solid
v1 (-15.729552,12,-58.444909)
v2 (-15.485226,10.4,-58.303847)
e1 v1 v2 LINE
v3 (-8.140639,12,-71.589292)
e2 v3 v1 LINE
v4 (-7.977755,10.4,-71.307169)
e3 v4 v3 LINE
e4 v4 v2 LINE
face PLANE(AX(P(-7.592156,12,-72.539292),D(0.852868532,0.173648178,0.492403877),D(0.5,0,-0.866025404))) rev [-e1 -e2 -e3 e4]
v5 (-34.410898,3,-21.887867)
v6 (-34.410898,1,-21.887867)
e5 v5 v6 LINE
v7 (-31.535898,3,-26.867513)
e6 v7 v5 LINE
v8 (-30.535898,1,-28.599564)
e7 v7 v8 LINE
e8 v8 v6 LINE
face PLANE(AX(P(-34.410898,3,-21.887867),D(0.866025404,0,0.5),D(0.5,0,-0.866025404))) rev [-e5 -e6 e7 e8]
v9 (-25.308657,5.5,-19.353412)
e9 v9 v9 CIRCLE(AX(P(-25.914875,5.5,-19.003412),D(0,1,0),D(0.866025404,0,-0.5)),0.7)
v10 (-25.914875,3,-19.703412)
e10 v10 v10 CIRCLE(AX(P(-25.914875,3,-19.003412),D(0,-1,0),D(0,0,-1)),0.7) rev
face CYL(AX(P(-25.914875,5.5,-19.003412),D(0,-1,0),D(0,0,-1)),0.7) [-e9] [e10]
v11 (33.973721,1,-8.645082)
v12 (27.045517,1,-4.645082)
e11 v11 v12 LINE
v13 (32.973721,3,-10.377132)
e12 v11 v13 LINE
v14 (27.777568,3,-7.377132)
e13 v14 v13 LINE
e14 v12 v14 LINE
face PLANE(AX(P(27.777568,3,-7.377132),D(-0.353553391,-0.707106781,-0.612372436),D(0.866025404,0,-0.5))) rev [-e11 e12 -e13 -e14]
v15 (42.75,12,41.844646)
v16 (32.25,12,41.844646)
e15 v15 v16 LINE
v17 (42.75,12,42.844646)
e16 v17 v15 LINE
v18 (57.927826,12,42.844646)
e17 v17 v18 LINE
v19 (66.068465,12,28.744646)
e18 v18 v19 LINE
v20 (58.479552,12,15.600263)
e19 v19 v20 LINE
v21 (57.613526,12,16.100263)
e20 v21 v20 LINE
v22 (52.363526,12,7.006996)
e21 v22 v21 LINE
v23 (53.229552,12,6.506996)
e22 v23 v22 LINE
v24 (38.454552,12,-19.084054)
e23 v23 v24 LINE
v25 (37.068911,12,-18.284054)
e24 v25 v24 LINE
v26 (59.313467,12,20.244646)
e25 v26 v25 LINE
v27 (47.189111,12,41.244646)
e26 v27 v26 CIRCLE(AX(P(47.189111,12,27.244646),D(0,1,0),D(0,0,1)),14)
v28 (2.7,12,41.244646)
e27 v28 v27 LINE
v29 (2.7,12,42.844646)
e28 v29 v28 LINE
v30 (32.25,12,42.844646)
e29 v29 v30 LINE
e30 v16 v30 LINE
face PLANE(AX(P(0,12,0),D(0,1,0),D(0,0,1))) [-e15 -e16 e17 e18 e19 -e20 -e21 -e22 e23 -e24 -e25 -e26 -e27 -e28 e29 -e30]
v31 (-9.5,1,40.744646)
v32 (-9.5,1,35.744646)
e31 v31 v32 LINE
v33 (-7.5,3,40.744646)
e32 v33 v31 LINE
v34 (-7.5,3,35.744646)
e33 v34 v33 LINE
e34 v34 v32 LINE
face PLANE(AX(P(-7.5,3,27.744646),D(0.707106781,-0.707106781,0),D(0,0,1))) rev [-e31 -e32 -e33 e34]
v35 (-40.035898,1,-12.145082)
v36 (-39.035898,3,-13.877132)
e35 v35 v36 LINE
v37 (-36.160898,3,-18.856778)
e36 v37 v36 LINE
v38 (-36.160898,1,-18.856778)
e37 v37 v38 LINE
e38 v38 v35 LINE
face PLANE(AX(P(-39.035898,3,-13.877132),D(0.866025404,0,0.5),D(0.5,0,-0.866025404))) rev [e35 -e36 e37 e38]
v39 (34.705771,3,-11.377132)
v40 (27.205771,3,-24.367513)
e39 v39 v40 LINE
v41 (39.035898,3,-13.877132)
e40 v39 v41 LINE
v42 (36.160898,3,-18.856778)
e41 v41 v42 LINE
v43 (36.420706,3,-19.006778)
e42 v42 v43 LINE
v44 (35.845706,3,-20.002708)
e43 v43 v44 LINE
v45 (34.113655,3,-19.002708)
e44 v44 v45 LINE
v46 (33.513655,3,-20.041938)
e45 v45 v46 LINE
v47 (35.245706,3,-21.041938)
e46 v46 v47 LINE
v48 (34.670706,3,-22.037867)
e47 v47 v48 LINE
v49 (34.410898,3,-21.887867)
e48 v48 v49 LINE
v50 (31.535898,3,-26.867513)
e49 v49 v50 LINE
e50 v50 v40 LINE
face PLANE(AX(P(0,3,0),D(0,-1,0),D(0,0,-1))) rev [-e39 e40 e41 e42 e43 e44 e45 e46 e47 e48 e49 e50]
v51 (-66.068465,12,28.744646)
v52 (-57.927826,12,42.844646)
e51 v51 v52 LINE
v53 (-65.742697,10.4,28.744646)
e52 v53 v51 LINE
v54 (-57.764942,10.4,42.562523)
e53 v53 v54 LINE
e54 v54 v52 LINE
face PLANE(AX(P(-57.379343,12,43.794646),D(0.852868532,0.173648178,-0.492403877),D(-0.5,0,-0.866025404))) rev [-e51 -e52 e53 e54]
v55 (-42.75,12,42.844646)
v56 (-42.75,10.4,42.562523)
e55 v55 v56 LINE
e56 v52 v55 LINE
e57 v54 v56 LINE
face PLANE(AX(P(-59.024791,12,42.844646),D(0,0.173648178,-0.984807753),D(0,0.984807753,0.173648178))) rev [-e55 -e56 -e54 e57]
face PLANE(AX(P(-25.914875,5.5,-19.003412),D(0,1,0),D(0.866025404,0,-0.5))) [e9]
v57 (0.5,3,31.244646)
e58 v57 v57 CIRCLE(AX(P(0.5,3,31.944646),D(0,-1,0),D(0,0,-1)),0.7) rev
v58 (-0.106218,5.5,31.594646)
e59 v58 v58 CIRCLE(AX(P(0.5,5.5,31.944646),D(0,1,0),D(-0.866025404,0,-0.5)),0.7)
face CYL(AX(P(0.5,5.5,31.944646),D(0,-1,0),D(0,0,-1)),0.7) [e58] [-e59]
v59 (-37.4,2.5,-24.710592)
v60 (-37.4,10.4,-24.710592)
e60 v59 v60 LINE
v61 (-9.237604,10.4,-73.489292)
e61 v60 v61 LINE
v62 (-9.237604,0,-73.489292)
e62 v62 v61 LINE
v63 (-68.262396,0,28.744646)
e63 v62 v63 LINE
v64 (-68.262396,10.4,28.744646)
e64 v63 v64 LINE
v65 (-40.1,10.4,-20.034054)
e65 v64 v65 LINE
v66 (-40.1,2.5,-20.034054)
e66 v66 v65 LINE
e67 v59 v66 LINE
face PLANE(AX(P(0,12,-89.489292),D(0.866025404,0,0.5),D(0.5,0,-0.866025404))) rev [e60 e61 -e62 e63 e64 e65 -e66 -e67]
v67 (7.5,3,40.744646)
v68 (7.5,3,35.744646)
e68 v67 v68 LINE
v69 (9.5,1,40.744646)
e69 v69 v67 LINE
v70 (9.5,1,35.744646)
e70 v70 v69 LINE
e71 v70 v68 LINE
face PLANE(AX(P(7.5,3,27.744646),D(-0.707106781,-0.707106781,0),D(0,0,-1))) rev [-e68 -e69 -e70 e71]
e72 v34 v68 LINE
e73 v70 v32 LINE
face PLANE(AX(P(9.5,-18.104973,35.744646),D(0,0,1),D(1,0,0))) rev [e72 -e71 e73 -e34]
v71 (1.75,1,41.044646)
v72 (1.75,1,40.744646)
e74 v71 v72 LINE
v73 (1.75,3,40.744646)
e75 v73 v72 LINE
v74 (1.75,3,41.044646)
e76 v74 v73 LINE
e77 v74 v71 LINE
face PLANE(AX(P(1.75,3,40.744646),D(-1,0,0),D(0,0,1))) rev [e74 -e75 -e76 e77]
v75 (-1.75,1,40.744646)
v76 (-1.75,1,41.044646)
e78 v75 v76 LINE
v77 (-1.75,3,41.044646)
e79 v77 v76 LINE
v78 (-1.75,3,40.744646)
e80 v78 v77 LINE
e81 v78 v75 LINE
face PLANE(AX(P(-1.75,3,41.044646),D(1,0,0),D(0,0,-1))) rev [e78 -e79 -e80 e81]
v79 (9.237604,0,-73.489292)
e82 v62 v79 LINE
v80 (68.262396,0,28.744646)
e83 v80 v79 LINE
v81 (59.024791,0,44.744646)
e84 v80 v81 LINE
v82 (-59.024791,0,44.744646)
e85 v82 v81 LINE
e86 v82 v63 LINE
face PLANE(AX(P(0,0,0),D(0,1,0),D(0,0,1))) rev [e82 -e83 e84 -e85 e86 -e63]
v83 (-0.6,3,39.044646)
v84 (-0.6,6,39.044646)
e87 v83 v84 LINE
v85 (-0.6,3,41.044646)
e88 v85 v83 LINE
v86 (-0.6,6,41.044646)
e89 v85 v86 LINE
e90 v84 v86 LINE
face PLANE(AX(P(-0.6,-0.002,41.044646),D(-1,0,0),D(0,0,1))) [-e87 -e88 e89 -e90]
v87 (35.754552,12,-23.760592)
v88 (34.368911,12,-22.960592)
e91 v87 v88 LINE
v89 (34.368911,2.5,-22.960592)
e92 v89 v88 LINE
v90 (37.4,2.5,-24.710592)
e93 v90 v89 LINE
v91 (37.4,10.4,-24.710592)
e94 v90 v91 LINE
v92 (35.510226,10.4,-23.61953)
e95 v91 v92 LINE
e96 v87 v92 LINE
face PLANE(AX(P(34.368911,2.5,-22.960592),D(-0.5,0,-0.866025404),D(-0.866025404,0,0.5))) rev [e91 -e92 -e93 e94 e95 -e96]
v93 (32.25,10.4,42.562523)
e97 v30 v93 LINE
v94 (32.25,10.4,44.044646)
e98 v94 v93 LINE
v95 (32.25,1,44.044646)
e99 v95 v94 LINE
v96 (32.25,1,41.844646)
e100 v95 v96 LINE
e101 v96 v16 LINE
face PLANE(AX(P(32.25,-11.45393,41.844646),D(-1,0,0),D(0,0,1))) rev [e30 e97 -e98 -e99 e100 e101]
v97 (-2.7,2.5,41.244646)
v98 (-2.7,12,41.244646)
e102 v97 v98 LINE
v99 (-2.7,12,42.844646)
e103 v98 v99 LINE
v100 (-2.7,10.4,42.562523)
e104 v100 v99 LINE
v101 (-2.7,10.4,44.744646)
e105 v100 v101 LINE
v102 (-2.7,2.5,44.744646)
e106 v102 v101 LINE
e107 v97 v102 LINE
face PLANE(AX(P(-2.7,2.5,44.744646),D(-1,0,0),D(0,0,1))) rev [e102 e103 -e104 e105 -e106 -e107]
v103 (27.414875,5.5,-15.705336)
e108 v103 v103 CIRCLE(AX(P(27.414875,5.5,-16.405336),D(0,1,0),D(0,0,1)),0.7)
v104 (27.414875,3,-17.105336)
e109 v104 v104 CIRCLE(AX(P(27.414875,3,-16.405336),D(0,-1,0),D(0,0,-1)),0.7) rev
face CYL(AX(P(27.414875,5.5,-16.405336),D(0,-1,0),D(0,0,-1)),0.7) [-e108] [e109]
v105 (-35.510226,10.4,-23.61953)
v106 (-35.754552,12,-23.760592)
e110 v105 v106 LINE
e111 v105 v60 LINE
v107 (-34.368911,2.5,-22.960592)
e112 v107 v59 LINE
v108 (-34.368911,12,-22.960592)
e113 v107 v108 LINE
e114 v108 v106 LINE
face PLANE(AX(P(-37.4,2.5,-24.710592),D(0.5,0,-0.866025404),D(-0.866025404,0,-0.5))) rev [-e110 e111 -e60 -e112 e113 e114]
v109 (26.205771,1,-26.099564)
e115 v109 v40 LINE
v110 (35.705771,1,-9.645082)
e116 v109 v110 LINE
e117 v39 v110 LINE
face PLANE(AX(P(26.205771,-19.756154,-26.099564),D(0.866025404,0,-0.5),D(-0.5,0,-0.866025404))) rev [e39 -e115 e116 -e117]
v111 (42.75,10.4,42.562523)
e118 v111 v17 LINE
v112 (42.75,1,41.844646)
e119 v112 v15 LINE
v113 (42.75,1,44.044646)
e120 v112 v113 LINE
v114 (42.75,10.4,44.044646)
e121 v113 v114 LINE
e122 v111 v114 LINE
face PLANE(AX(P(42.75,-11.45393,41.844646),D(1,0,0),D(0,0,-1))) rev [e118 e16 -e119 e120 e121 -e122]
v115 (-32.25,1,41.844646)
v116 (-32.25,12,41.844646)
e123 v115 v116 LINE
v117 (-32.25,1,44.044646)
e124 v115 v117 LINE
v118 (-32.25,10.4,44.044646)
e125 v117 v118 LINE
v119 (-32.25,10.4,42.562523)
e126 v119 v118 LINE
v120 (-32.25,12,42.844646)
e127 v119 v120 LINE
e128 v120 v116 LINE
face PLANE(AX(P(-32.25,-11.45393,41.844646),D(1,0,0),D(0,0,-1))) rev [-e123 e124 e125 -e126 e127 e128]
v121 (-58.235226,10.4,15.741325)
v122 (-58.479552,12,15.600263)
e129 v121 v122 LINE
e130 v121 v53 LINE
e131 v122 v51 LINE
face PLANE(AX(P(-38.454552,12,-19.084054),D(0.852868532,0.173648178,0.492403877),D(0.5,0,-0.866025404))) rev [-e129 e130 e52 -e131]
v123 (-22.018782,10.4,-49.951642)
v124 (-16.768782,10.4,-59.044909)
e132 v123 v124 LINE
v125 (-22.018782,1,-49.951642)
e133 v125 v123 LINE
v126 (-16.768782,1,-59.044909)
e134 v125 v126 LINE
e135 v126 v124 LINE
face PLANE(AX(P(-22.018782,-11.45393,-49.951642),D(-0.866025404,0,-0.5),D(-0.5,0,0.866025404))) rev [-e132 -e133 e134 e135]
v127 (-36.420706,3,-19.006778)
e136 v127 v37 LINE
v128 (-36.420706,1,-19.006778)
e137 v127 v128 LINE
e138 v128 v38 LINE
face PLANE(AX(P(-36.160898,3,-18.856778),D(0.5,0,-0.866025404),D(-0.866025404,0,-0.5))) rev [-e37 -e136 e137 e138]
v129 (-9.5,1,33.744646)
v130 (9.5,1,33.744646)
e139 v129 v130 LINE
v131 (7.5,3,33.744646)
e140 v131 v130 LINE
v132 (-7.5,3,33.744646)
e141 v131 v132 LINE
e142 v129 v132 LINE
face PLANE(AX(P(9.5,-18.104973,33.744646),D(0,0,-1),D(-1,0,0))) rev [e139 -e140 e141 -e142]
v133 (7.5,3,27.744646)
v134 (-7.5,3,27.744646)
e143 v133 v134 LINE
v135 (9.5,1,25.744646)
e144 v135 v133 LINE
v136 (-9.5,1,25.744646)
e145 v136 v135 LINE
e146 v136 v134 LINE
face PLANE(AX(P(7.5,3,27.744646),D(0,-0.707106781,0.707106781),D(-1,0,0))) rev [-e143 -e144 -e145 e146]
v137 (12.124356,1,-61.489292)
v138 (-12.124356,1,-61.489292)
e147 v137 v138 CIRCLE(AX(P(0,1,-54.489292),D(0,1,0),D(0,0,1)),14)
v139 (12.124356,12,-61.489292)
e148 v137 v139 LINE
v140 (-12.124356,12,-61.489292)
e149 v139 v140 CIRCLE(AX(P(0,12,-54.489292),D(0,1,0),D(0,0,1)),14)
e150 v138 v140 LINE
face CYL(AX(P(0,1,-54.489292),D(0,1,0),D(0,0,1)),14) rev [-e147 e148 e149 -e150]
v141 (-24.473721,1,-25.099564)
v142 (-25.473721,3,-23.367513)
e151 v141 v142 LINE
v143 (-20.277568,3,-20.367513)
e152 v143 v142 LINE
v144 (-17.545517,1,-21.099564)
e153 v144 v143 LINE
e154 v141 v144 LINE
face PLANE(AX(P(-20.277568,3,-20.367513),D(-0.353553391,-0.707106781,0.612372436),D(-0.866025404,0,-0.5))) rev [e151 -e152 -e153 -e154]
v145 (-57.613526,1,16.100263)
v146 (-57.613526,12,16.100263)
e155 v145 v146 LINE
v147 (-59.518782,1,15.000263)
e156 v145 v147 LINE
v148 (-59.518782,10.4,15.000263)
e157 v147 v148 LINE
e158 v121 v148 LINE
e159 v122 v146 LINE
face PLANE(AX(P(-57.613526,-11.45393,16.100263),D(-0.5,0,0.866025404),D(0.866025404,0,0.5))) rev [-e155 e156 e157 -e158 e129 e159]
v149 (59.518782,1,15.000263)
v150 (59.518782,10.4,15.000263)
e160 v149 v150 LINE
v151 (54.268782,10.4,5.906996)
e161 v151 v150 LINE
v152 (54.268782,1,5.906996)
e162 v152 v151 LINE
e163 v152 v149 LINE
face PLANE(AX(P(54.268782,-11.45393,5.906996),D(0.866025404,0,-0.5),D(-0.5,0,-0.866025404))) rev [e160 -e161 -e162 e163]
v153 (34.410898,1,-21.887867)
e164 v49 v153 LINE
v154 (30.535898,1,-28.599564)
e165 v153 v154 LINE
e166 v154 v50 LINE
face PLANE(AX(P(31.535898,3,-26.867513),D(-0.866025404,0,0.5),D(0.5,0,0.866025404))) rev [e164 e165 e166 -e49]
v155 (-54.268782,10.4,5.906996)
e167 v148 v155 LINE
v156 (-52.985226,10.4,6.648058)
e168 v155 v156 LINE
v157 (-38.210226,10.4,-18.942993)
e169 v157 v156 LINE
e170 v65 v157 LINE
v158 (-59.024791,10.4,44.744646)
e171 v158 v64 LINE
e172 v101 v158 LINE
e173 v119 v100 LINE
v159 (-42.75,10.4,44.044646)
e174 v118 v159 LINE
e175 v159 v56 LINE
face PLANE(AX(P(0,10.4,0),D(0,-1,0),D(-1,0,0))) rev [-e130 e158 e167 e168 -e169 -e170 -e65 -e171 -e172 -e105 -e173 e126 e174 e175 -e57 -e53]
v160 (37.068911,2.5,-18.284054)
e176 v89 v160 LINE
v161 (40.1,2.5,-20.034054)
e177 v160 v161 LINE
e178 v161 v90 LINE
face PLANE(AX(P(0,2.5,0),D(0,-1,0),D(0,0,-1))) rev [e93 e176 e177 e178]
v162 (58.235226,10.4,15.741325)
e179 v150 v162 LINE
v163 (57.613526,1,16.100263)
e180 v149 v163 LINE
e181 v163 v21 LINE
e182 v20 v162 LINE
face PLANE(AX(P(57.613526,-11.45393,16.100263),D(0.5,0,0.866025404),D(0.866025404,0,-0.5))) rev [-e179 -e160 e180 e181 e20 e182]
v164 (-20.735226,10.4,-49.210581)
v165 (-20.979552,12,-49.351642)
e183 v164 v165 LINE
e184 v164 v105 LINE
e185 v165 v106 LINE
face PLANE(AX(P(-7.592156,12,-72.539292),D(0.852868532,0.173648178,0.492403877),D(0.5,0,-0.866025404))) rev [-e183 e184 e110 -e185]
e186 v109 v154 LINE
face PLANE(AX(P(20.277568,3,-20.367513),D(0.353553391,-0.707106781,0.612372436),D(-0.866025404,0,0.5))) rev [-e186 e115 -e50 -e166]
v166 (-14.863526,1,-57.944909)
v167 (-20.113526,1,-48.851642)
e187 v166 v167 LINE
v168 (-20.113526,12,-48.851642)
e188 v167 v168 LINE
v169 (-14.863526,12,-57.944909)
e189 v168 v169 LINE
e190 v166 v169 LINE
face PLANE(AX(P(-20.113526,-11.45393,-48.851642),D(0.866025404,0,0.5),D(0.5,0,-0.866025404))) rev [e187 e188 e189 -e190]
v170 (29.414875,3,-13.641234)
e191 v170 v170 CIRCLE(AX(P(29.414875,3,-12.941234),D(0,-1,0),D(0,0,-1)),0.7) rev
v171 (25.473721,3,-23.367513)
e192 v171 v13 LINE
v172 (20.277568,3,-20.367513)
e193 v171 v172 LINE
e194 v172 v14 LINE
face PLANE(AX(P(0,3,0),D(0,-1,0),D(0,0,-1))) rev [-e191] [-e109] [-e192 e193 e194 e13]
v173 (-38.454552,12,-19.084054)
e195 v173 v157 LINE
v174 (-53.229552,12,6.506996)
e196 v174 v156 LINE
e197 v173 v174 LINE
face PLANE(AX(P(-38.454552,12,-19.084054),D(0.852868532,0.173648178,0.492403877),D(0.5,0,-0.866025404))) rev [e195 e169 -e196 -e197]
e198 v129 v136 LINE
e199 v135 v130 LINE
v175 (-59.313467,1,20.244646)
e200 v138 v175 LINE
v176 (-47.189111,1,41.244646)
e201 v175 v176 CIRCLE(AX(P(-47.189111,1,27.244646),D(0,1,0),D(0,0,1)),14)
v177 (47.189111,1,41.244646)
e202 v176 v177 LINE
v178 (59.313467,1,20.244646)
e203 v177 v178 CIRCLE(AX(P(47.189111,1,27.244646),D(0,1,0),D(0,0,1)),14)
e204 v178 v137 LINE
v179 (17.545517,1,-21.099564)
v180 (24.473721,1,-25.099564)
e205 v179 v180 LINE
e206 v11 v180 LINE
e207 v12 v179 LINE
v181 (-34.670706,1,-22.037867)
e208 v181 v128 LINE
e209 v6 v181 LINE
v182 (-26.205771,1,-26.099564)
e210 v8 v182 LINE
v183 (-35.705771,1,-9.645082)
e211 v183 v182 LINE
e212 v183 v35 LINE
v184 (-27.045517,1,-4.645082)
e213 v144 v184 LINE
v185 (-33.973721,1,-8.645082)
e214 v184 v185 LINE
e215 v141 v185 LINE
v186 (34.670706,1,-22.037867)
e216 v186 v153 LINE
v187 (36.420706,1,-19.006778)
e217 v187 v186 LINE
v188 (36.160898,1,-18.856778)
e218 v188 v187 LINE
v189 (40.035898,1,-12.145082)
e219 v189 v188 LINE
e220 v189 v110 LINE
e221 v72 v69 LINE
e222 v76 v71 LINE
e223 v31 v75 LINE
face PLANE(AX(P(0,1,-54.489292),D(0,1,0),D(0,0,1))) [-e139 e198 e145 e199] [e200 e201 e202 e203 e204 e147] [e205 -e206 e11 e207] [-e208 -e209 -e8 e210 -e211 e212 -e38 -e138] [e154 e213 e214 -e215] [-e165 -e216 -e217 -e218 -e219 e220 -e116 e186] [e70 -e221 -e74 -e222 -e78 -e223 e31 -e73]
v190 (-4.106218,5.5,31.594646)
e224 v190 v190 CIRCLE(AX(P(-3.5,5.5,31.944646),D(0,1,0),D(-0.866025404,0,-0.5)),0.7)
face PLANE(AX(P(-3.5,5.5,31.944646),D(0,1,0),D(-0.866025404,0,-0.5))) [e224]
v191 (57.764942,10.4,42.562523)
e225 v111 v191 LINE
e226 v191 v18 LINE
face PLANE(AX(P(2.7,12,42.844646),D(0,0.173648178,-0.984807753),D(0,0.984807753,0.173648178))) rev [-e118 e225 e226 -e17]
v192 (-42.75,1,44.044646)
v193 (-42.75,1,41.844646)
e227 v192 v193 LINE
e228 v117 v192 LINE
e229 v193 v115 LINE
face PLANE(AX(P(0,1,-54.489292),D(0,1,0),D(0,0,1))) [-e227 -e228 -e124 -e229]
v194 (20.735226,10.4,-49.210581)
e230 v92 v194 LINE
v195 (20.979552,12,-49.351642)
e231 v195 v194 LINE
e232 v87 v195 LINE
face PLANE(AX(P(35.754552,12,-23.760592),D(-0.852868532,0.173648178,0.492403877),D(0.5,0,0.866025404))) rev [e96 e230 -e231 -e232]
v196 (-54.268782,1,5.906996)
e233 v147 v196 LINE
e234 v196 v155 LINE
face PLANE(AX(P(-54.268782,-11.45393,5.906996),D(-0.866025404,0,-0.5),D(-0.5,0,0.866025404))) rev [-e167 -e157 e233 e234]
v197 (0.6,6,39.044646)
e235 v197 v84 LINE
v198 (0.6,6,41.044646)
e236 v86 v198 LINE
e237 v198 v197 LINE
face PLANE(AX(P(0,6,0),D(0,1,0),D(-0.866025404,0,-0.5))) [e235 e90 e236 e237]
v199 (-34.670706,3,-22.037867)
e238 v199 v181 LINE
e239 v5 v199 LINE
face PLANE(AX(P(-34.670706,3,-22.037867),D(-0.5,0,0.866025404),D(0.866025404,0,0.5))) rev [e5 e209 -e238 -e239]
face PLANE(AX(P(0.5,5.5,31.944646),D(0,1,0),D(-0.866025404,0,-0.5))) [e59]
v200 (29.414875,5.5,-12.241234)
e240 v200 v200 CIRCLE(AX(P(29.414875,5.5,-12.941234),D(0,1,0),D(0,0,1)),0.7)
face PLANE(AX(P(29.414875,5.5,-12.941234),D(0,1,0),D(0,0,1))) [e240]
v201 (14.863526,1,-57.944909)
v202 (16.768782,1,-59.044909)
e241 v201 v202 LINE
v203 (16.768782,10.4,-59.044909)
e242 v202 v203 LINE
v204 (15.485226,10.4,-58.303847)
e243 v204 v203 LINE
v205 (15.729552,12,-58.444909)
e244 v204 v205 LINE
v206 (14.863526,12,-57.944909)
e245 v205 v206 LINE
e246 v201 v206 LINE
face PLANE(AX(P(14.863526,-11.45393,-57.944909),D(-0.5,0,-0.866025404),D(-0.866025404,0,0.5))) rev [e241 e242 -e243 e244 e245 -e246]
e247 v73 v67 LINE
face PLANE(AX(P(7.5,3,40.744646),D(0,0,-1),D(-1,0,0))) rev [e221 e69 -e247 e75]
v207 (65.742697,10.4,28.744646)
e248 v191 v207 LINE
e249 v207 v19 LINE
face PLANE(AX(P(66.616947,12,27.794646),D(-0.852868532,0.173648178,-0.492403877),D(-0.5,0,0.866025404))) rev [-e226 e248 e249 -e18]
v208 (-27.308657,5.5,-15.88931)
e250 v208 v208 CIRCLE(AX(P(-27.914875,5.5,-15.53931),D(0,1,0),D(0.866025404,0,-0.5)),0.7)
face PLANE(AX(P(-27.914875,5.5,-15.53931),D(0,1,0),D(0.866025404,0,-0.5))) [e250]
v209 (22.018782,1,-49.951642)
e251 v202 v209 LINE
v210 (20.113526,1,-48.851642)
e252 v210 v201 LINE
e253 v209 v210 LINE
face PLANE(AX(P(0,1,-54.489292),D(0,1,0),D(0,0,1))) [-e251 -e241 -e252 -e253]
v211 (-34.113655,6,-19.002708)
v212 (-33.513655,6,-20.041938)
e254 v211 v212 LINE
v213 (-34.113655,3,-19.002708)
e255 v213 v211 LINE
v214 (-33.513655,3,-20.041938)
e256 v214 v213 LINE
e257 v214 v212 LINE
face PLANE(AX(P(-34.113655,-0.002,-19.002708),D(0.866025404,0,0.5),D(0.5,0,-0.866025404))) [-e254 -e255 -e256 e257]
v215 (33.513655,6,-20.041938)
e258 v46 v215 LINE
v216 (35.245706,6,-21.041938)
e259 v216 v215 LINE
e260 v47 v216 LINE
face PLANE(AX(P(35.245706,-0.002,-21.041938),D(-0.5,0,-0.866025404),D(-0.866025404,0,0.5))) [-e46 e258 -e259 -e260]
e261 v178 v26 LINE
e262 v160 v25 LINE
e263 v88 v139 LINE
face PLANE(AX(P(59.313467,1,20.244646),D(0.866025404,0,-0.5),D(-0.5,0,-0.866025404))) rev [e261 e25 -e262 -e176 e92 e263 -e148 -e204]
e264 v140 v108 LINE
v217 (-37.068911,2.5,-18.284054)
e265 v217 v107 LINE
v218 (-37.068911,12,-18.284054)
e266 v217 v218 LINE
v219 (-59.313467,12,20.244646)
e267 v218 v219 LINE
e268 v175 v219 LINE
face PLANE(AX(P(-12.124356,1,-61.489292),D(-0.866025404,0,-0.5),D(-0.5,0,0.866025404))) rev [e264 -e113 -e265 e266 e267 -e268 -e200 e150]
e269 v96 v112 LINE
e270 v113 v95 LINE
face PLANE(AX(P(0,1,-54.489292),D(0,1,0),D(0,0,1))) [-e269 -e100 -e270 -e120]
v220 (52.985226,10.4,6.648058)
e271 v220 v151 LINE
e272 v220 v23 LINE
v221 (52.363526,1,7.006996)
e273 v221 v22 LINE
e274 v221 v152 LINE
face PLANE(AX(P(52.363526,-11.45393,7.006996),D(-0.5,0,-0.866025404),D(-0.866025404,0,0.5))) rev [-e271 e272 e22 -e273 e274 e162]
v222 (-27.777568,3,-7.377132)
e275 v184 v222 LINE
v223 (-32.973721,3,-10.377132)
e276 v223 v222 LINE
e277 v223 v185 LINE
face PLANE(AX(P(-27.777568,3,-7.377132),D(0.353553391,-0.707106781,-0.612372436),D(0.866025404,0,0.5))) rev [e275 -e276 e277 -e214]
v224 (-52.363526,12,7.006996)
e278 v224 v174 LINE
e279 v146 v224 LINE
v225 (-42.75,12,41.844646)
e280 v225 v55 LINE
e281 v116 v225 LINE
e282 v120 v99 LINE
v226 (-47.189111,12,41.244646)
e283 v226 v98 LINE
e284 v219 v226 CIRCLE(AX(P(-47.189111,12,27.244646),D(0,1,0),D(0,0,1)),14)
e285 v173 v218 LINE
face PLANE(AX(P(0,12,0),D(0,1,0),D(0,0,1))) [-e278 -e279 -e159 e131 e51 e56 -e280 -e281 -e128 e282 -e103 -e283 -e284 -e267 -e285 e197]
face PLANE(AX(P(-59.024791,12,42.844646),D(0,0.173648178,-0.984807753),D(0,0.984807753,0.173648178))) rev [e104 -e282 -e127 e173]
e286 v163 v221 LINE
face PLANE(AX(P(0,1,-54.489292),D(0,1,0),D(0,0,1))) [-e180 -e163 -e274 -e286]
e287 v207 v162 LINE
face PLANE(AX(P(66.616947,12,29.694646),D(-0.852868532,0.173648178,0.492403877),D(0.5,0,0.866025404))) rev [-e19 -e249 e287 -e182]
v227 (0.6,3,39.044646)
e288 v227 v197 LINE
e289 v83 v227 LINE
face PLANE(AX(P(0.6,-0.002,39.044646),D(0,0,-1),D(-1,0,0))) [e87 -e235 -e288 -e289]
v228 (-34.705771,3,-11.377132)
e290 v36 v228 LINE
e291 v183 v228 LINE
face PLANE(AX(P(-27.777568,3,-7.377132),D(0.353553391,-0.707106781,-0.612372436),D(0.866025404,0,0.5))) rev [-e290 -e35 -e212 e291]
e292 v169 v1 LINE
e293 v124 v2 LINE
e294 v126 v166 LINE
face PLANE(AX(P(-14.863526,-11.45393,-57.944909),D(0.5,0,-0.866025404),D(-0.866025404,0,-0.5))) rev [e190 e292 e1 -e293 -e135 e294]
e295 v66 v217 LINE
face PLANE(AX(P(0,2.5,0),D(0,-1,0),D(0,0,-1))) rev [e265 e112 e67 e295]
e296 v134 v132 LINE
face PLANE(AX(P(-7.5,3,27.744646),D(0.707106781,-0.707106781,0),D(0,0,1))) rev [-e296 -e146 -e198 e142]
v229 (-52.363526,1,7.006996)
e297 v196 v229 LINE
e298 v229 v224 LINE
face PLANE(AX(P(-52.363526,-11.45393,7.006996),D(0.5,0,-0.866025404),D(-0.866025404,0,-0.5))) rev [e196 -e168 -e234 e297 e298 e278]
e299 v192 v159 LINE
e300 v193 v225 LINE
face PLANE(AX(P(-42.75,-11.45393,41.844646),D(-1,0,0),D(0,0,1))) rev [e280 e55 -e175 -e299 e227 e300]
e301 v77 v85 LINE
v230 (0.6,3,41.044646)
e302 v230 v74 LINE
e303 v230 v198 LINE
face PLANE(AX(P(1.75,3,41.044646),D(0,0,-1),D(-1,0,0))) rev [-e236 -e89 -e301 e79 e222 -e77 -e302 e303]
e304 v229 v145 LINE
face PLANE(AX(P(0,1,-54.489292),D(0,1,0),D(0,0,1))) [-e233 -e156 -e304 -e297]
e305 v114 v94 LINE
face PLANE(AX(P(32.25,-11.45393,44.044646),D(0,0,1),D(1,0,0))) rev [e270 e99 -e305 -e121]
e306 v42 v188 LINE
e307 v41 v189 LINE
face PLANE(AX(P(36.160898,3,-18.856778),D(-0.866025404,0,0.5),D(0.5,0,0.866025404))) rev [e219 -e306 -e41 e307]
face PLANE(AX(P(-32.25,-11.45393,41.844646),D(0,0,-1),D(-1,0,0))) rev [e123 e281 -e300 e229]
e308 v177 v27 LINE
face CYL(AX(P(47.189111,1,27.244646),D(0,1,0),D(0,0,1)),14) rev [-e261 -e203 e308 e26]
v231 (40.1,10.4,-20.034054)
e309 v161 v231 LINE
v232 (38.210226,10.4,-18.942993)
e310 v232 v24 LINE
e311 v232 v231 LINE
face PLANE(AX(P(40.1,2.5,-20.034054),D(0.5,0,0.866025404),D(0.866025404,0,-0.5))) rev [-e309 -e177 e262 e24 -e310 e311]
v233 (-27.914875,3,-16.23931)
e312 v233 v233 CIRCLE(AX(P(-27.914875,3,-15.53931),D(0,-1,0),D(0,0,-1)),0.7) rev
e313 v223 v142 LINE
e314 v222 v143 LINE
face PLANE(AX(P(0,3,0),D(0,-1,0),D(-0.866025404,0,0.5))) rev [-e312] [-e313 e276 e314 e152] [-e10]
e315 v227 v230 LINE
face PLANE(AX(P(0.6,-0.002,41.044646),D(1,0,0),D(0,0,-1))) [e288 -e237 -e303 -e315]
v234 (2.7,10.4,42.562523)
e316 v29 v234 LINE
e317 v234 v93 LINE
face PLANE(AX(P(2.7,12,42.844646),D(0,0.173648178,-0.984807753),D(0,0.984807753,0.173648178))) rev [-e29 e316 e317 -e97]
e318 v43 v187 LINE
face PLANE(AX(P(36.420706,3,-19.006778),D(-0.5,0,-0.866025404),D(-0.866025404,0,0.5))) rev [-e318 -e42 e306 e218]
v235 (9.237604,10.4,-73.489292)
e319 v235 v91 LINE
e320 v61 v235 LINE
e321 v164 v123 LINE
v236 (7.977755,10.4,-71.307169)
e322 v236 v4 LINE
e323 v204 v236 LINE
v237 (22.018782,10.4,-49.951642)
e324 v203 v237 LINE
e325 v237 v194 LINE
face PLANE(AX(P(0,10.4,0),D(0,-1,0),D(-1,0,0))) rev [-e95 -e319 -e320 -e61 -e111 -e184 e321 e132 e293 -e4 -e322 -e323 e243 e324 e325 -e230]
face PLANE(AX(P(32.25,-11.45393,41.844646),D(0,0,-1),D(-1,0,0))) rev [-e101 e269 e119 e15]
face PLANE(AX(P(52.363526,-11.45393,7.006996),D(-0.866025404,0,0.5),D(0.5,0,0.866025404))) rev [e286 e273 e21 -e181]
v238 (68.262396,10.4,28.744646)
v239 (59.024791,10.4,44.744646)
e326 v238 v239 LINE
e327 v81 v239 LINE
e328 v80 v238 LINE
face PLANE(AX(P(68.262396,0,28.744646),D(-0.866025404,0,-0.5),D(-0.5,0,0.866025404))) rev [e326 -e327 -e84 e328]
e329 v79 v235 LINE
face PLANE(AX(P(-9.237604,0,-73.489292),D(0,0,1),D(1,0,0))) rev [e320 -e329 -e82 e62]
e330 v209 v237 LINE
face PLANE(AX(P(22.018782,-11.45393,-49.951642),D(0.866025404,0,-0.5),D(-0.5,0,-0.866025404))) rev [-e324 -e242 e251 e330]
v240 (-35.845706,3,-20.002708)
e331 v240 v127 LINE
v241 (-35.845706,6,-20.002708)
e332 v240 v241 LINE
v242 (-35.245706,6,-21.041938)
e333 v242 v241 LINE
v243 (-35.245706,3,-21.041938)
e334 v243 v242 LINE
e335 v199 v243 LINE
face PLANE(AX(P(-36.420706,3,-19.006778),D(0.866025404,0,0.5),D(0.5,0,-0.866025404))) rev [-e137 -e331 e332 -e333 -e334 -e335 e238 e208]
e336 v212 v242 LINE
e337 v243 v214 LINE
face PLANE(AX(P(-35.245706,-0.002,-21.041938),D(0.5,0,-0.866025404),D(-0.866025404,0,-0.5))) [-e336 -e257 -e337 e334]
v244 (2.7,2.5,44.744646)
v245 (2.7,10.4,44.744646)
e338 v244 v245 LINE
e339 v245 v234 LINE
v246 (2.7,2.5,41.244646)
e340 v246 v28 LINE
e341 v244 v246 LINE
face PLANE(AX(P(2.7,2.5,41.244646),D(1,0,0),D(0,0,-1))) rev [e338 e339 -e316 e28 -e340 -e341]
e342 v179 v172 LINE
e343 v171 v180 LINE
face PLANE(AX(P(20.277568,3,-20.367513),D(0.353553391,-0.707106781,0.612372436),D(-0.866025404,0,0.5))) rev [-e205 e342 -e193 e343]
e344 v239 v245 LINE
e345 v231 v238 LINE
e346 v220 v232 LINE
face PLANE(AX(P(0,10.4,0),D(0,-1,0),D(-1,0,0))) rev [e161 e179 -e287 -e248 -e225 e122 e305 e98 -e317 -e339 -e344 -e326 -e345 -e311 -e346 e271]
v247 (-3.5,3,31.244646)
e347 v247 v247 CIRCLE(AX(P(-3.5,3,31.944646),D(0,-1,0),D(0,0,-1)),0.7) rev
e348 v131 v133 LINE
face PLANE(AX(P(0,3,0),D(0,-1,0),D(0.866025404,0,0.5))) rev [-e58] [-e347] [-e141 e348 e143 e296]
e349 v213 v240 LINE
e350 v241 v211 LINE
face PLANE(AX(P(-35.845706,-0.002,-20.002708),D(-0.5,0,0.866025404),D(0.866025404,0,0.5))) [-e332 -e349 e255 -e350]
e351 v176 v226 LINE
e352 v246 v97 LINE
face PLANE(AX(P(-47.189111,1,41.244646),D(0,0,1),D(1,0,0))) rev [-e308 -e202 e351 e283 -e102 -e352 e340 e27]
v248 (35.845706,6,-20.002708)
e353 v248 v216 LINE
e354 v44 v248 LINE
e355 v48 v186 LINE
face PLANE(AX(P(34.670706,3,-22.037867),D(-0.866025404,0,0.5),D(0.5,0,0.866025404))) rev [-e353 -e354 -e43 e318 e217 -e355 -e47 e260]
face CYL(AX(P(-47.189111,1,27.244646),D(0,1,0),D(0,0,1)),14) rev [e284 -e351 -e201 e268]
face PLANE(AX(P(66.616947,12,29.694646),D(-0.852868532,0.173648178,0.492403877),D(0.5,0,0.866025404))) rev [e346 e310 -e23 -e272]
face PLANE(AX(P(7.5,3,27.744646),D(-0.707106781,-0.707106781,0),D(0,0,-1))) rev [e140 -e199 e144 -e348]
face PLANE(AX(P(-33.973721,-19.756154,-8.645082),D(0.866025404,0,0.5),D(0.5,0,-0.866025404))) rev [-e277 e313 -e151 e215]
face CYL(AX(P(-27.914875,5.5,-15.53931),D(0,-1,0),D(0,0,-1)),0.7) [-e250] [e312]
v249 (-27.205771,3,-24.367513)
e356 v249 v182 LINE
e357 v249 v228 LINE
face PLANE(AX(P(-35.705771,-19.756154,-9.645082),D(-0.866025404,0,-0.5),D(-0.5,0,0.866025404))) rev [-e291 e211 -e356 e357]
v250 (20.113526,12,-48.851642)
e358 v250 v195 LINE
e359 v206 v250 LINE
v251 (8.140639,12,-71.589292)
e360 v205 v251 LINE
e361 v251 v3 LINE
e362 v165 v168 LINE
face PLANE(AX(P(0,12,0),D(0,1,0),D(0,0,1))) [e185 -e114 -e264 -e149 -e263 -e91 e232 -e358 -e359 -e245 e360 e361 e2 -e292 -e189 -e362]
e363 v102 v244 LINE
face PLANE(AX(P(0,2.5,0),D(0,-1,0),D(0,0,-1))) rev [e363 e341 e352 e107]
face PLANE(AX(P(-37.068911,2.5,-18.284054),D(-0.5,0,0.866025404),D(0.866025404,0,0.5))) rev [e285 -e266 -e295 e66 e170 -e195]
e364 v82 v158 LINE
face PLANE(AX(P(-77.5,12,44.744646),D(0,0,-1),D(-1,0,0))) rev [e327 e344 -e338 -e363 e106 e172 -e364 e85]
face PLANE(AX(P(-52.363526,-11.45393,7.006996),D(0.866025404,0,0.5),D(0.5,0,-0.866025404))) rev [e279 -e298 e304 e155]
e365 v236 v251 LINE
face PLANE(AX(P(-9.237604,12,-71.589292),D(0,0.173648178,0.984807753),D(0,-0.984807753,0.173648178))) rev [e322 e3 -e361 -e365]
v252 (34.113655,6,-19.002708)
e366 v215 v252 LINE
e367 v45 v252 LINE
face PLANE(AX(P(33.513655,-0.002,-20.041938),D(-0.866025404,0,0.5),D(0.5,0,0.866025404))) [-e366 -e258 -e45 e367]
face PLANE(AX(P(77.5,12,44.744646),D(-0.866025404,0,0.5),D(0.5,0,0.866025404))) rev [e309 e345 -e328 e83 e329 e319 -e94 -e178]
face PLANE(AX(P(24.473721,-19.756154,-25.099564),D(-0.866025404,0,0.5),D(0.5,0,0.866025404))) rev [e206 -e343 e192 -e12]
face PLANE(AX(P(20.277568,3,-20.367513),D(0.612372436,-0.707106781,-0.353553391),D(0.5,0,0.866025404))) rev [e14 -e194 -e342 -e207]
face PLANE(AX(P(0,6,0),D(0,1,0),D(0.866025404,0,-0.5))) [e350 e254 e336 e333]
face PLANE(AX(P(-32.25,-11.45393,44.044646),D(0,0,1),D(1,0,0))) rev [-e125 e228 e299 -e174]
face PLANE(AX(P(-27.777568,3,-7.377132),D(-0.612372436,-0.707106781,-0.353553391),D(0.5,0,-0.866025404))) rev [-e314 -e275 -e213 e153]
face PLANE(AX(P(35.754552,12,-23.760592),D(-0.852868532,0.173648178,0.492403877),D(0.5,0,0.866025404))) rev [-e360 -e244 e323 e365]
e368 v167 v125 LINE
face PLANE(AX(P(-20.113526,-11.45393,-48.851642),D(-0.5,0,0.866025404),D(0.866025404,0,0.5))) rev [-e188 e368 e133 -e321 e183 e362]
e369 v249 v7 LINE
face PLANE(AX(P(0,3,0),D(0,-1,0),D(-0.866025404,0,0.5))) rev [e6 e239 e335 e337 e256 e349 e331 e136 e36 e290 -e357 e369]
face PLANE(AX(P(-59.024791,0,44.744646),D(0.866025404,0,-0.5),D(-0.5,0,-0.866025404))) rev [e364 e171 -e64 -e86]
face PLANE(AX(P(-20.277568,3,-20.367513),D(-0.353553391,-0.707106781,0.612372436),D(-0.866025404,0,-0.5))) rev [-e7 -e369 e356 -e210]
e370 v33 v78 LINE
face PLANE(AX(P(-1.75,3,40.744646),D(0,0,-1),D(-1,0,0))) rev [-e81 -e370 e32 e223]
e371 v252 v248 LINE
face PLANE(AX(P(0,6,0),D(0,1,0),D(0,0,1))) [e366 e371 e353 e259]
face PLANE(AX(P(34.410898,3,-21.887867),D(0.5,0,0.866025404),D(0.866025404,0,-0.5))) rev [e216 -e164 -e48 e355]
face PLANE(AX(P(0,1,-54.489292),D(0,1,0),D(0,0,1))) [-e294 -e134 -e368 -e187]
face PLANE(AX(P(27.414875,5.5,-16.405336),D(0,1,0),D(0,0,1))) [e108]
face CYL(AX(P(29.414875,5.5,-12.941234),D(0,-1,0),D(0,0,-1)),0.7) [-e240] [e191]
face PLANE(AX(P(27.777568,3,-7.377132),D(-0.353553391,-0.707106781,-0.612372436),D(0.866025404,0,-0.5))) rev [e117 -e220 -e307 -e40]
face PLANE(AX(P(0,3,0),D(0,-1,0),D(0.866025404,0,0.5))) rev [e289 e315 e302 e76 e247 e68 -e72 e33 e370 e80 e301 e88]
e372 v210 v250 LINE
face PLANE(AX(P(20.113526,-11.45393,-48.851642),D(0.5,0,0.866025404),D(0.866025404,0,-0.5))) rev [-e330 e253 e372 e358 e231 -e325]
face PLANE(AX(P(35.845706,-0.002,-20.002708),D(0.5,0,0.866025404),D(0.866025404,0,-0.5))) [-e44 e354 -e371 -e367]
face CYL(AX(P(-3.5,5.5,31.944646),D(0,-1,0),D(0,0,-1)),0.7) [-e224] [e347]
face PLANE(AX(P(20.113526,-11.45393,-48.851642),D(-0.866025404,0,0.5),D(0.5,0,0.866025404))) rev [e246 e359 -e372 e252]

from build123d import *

# Parameters (mm, degrees)
BOSS_EXTRU_1_DEPTH                        = 12
ENL_V_MAT_EXTRU_1_DEPTH                   = 119.989845505
ENL_V_MAT_EXTRU_2_DEPTH                   = 11
ESQUISSE4_W                               = 5.4
ESQUISSE4_H                               = 3.5
ENL_V_MAT_EXTRU_3_DEPTH                   = 9.5
BOSS_EXTRU_2_DEPTH                        = 2
ESQUISSE13_R                              = 0.7
BOSS_EXTRU_3_DEPTH                        = 2.5
BOSS_EXTRU_8_DEPTH                        = 3
CHANFREIN4_SIZE                           = 2
ENL_V_MAT_EXTRU_11_DEPTH                  = 2
R_P_TITION_START                          = 1
R_P_TITION_CIRCULAIRE1_OUTLINE_W          = 1.2
R_P_TITION_CIRCULAIRE1_OUTLINE_H          = 2
R_P_TITION_CIRCULAIRE1_OUTLINE_R          = 0.7
R_P_TITION_CIRCULAIRE1_DEPTH              = 4.5
R_P_TITION_START_2                        = 5.5
R_P_TITION_CIRCULAIRE1_2_OUTLINE_W        = 1.2
R_P_TITION_CIRCULAIRE1_2_OUTLINE_H        = 2
R_P_TITION_CIRCULAIRE1_2_DEPTH            = 0.5
ENL_V_DE_MAT_EXTRU_MINCE1_DEPTH           = 1.6
ENL_V_DE_MAT_EXTRU_MINCE1_DRAFT           = 10
ENL_V_DE_MAT_EXTRU_MINCE1_PROFILE_2_DEPTH = 1.6
ENL_V_DE_MAT_EXTRU_MINCE1_PROFILE_2_DRAFT = 10
ENL_V_DE_MAT_EXTRU_MINCE1_PROFILE_3_DEPTH = 1.6
ENL_V_DE_MAT_EXTRU_MINCE1_PROFILE_3_DRAFT = 10
ESQUISSE18_W                              = 10.5
ESQUISSE18_H                              = 2.2
ENL_V_MAT_EXTRU_10_DEPTH                  = 11


with BuildPart() as part:
    # Esquisse1 → Boss.-Extru.1 (new body)
    with BuildSketch(Plane(origin=(0, 0, 0), x_dir=(1, 0, 0), z_dir=(0, 1, 0))):
        Polygon((-77.5, -44.744645862), (77.5, -44.744645862), (0, 89.489291724), align=None)
    extrude(amount=BOSS_EXTRU_1_DEPTH)

    # Esquisse2 → Enlèv. mat.-Extru.1 (cut, through all)
    with BuildSketch(Plane(origin=(0, 12, 0), x_dir=(1, 0, 0), z_dir=(0, 1, 0))):
        Polygon((-9.237604307, 73.489291724), (9.237604307, 73.489291724), (0, 89.489291724), align=None)
        Polygon((77.5, -44.744645862), (68.262395693, -28.744645862), (59.024791386, -44.744645862), align=None)
        Polygon((-77.5, -44.744645862), (-59.024791386, -44.744645862), (-68.262395693, -28.744645862), align=None)
    extrude(amount=-ENL_V_MAT_EXTRU_1_DEPTH, mode=Mode.SUBTRACT)

    # Esquisse3 → Enlèv. mat.-Extru.2 (cut)
    with BuildSketch(Plane(origin=(0, 12, 0), x_dir=(1, 0, 0), z_dir=(0, 1, 0))):
        with BuildLine():
            Line((59.313466521, -20.244645862), (12.124355653, 61.489291724))
            ThreePointArc((12.124355653, 61.489291724), (0, 68.489291724), (-12.124355653, 61.489291724))
            Line((-12.124355653, 61.489291724), (-59.313466521, -20.244645862))
            ThreePointArc((-59.313466521, -20.244645862), (-59.313466521, -34.244645862), (-47.189110868, -41.244645862))
            Line((-47.189110868, -41.244645862), (47.189110868, -41.244645862))
            ThreePointArc((47.189110868, -41.244645862), (59.313466521, -34.244645862), (59.313466521, -20.244645862))
        make_face()
    extrude(amount=-ENL_V_MAT_EXTRU_2_DEPTH, mode=Mode.SUBTRACT)

    # Esquisse4 → Enlèv. mat.-Extru.3 (cut)
    with BuildSketch(Plane(origin=(0, 12, 0), x_dir=(1, 0, 0), z_dir=(0, 1, 0))):
        Polygon((37.068911087, 18.284054341), (34.368911087, 22.960591521), (37.4, 24.710591521), (40.1, 20.034054341), align=None)
        with Locations((0, -42.994645862)):
            Rectangle(ESQUISSE4_W, ESQUISSE4_H)
        Polygon((-37.4, 24.710591521), (-34.368911087, 22.960591521), (-37.068911087, 18.284054341), (-40.1, 20.034054341), align=None)
    extrude(amount=-ENL_V_MAT_EXTRU_3_DEPTH, mode=Mode.SUBTRACT)

    # Esquisse12 → Boss.-Extru.2 (add)
    with BuildSketch(Plane(origin=(0, 1, 0), x_dir=(1, 0, 0), z_dir=(0, 1, 0))):
        Polygon((20.277568136, 20.367513459), (27.777568136, 7.377132403), (39.035898385, 13.877132403), (36.160898385, 18.856778474), (36.420706006, 19.006778474), (34.670706006, 22.037867388), (34.410898385, 21.887867388), (31.535898385, 26.867513459), align=None)
    extrude(amount=BOSS_EXTRU_2_DEPTH)

    # Esquisse13 → Boss.-Extru.3 (add)
    with BuildSketch(Plane(origin=(0, 3, 0), x_dir=(1, 0, 0), z_dir=(0, 1, 0))):
        with Locations(Location((27.414874832, 16.405335633, 0), (0, 0, 90))):
            Circle(ESQUISSE13_R)
        with Locations(Location((29.414874832, 12.941234018, 0), (0, 0, 90))):
            Circle(ESQUISSE13_R)
    extrude(amount=BOSS_EXTRU_3_DEPTH)

    # Esquisse20 → Boss.-Extru.8 (add, symmetric)
    with BuildSketch(Plane(origin=(0, 3, 0), x_dir=(1, 0, 0), z_dir=(0, 1, 0))):
        Polygon((35.245706006, 21.041938173), (35.845706006, 20.002707689), (34.113655198, 19.002707689), (33.513655198, 20.041938173), align=None)
    extrude(amount=BOSS_EXTRU_8_DEPTH, both=True)

    # Chanfrein4
    chanfrein4_edges = [part.edges().sort_by_distance(p)[0] for p in [
        (25.90673326, 1, -23.617513459),
        (24.027568136, 1, -13.872322931),
        (33.40673326, 1, -10.627132403),
    ]]
    chamfer(chanfrein4_edges, length=CHANFREIN4_SIZE - 0.0001)  # a hair under: the kernel refuses the full size

    # Esquisse21 → Enlèv. mat.-Extru.11 (cut)
    with BuildSketch(Plane(origin=(0, 3, 0), x_dir=(1, 0, 0), z_dir=(0, 1, 0))):
        Polygon((24.473720558, 25.099564267), (26.205771366, 26.099564267), (35.705771366, 9.645081595), (33.973720558, 8.645081595), align=None)
    extrude(amount=-ENL_V_MAT_EXTRU_11_DEPTH, mode=Mode.SUBTRACT)

    # Répétition circulaire1: read off the stored shape, not the designer's step
    # Répétition circulaire1 outline → Répétition circulaire1 (add)
    with BuildSketch(Plane(origin=(0, 0, 0), x_dir=(1, 0, 0), z_dir=(0, 1, 0)).offset(R_P_TITION_START)):
        Polygon((-35.245706006, 21.041938173), (-35.845706006, 20.002707689), (-34.113655198, 19.002707689), (-33.513655198, 20.041938173), align=None)
        with Locations((0, -40.044645862)):
            Rectangle(R_P_TITION_CIRCULAIRE1_OUTLINE_W, R_P_TITION_CIRCULAIRE1_OUTLINE_H)
        with Locations((-27.914874832, 15.539310229)):
            Circle(R_P_TITION_CIRCULAIRE1_OUTLINE_R)
        with Locations((-25.914874832, 19.003411844)):
            Circle(R_P_TITION_CIRCULAIRE1_OUTLINE_R)
        with Locations((0.5, -31.944645862)):
            Circle(R_P_TITION_CIRCULAIRE1_OUTLINE_R)
        with Locations((-3.5, -31.944645862)):
            Circle(R_P_TITION_CIRCULAIRE1_OUTLINE_R)
    extrude(amount=R_P_TITION_CIRCULAIRE1_DEPTH)

    # R_p_tition circulaire1 2 outline → R_p_tition circulaire1 2 (add)
    with BuildSketch(Plane(origin=(0, 0, 0), x_dir=(1, 0, 0), z_dir=(0, 1, 0)).offset(R_P_TITION_START_2)):
        Polygon((-35.245706006, 21.041938173), (-35.845706006, 20.002707689), (-34.113655198, 19.002707689), (-33.513655198, 20.041938173), align=None)
        with Locations((0, -40.044645862)):
            Rectangle(R_P_TITION_CIRCULAIRE1_2_OUTLINE_W, R_P_TITION_CIRCULAIRE1_2_OUTLINE_H)
    extrude(amount=R_P_TITION_CIRCULAIRE1_2_DEPTH)

    # R_p_tition circulaire1 3: loft between two sections, ruled curve by curve
    r_p_tition_circulaire1_3_from = [
        Edge.make_line((-25.473720558, 3, -23.367513459), (-20.277568136, 3, -20.367513459)),
        Edge.make_line((-32.973720558, 3, -10.377132403), (-27.777568136, 3, -7.377132403)),
        Edge.make_line((-20.277568136, 3, -20.367513459), (-27.777568136, 3, -7.377132403)),
        Edge.make_line((-32.973720558, 3, -10.377132403), (-25.473720558, 3, -23.367513459)),
    ]
    r_p_tition_circulaire1_3_to = [
        Edge.make_line((-24.473720558, 1, -25.099564267), (-17.545517328, 1, -21.099564267)),
        Edge.make_line((-33.973720558, 1, -8.645081595), (-27.045517328, 1, -4.645081595)),
        Edge.make_line((-17.545517328, 1, -21.099564267), (-27.045517328, 1, -4.645081595)),
        Edge.make_line((-33.973720558, 1, -8.645081595), (-24.473720558, 1, -25.099564267)),
    ]
    r_p_tition_circulaire1_3 = Solid(Shell([*[Face.make_surface_from_curves(r_p_tition_circulaire1_3_from[k], r_p_tition_circulaire1_3_to[k]) for k in range(4)], Face(Wire(r_p_tition_circulaire1_3_from)), Face(Wire(r_p_tition_circulaire1_3_to))]))
    add(r_p_tition_circulaire1_3)

    # R_p_tition circulaire1 4: loft between two sections, ruled curve by curve
    r_p_tition_circulaire1_4_from = [
        Edge.make_line((-7.5, 3, 33.744645862), (-7.5, 3, 27.744645862)),
        Edge.make_line((7.5, 3, 33.744645862), (7.5, 3, 27.744645862)),
        Edge.make_line((-7.5, 3, 27.744645862), (7.5, 3, 27.744645862)),
        Edge.make_line((7.5, 3, 33.744645862), (-7.5, 3, 33.744645862)),
    ]
    r_p_tition_circulaire1_4_to = [
        Edge.make_line((-9.5, 1, 33.744645862), (-9.5, 1, 25.744645862)),
        Edge.make_line((9.5, 1, 33.744645862), (9.5, 1, 25.744645862)),
        Edge.make_line((-9.5, 1, 25.744645862), (9.5, 1, 25.744645862)),
        Edge.make_line((9.5, 1, 33.744645862), (-9.5, 1, 33.744645862)),
    ]
    r_p_tition_circulaire1_4 = Solid(Shell([*[Face.make_surface_from_curves(r_p_tition_circulaire1_4_from[k], r_p_tition_circulaire1_4_to[k]) for k in range(4)], Face(Wire(r_p_tition_circulaire1_4_from)), Face(Wire(r_p_tition_circulaire1_4_to))]))
    add(r_p_tition_circulaire1_4)

    # R_p_tition circulaire1 5: loft between two sections, ruled curve by curve
    r_p_tition_circulaire1_5_from = [
        Edge.make_line((-27.205771366, 3, -24.367513459), (-31.535898385, 3, -26.867513459)),
        Edge.make_line((-34.705771366, 3, -11.377132403), (-39.035898385, 3, -13.877132403)),
        Edge.make_line((-34.410898385, 3, -21.887867388), (-31.535898385, 3, -26.867513459)),
        Edge.make_line((-39.035898385, 3, -13.877132403), (-36.160898385, 3, -18.856778474)),
        Edge.make_line((-34.670706006, 3, -22.037867388), (-34.410898385, 3, -21.887867388)),
        Edge.make_line((-36.160898385, 3, -18.856778474), (-36.420706006, 3, -19.006778474)),
        Edge.make_line((-27.205771366, 3, -24.367513459), (-34.705771366, 3, -11.377132403)),
        Edge.make_line((-36.420706006, 3, -19.006778474), (-34.670706006, 3, -22.037867388)),
    ]
    r_p_tition_circulaire1_5_to = [
        Edge.make_line((-26.205771366, 1, -26.099564267), (-30.535898385, 1, -28.599564267)),
        Edge.make_line((-35.705771366, 1, -9.645081595), (-40.035898385, 1, -12.145081595)),
        Edge.make_line((-34.410898385, 1, -21.887867388), (-30.535898385, 1, -28.599564267)),
        Edge.make_line((-40.035898385, 1, -12.145081595), (-36.160898385, 1, -18.856778474)),
        Edge.make_line((-34.670706006, 1, -22.037867388), (-34.410898385, 1, -21.887867388)),
        Edge.make_line((-36.160898385, 1, -18.856778474), (-36.420706006, 1, -19.006778474)),
        Edge.make_line((-26.205771366, 1, -26.099564267), (-35.705771366, 1, -9.645081595)),
        Edge.make_line((-36.420706006, 1, -19.006778474), (-34.670706006, 1, -22.037867388)),
    ]
    r_p_tition_circulaire1_5 = Solid(Shell([*[Face.make_surface_from_curves(r_p_tition_circulaire1_5_from[k], r_p_tition_circulaire1_5_to[k]) for k in range(8)], Face(Wire(r_p_tition_circulaire1_5_from)), Face(Wire(r_p_tition_circulaire1_5_to))]))
    add(r_p_tition_circulaire1_5)

    # R_p_tition circulaire1 6: loft between two sections, ruled curve by curve
    r_p_tition_circulaire1_6_from = [
        Edge.make_line((-7.5, 3, 35.744645862), (-7.5, 3, 40.744645862)),
        Edge.make_line((7.5, 3, 35.744645862), (7.5, 3, 40.744645862)),
        Edge.make_line((-1.75, 3, 40.744645862), (-7.5, 3, 40.744645862)),
        Edge.make_line((7.5, 3, 40.744645862), (1.75, 3, 40.744645862)),
        Edge.make_line((-1.75, 3, 41.044645862), (-1.75, 3, 40.744645862)),
        Edge.make_line((1.75, 3, 40.744645862), (1.75, 3, 41.044645862)),
        Edge.make_line((-7.5, 3, 35.744645862), (7.5, 3, 35.744645862)),
        Edge.make_line((1.75, 3, 41.044645862), (-1.75, 3, 41.044645862)),
    ]
    r_p_tition_circulaire1_6_to = [
        Edge.make_line((-9.5, 1, 35.744645862), (-9.5, 1, 40.744645862)),
        Edge.make_line((9.5, 1, 35.744645862), (9.5, 1, 40.744645862)),
        Edge.make_line((-1.75, 1, 40.744645862), (-9.5, 1, 40.744645862)),
        Edge.make_line((9.5, 1, 40.744645862), (1.75, 1, 40.744645862)),
        Edge.make_line((-1.75, 1, 41.044645862), (-1.75, 1, 40.744645862)),
        Edge.make_line((1.75, 1, 40.744645862), (1.75, 1, 41.044645862)),
        Edge.make_line((-9.5, 1, 35.744645862), (9.5, 1, 35.744645862)),
        Edge.make_line((1.75, 1, 41.044645862), (-1.75, 1, 41.044645862)),
    ]
    r_p_tition_circulaire1_6 = Solid(Shell([*[Face.make_surface_from_curves(r_p_tition_circulaire1_6_from[k], r_p_tition_circulaire1_6_to[k]) for k in range(8)], Face(Wire(r_p_tition_circulaire1_6_from)), Face(Wire(r_p_tition_circulaire1_6_to))]))
    add(r_p_tition_circulaire1_6)


with BuildPart() as enl_v_de_mat_extru_mince1_tool:
    # Esquisse17 → Enlèv. de mat.-Extru.-Mince1 (with draft: the straight prism first)
    with BuildSketch(Plane(origin=(0, 12, 0), x_dir=(1, 0, 0), z_dir=(0, 1, 0))):
        Polygon((37.4, 24.710591521), (9.237604307, 73.489291724), (-9.237604307, 73.489291724), (-37.4, 24.710591521), (-35.754551733, 23.760591521), (-8.140638796, 71.589291724), (8.140638796, 71.589291724), (35.754551733, 23.760591521), align=None)
    extrude(amount=-ENL_V_DE_MAT_EXTRU_MINCE1_DEPTH)
    # Enlèv. de mat.-Extru.-Mince1: the draft: its side faces are tilted about the plane it starts from
    enl_v_de_mat_extru_mince1_sides = [enl_v_de_mat_extru_mince1_tool.faces().sort_by_distance(p)[0] for p in [
        (23.318802154, 11.2, -49.099941623),
        (0, 11.2, -73.489291724),
        (-23.318802154, 11.2, -49.099941623),
        (-36.577275866, 11.2, -24.235591521),
        (-21.947595264, 11.2, -47.674941623),
        (0, 11.2, -71.589291724),
        (21.947595264, 11.2, -47.674941623),
        (36.577275866, 11.2, -24.235591521),
    ]]
    draft(enl_v_de_mat_extru_mince1_sides, Plane(origin=(0, 12, 0), x_dir=(1, 0, 0), z_dir=(0, 1, 0)), ENL_V_DE_MAT_EXTRU_MINCE1_DRAFT)


with BuildPart() as part_1:
    add(part.part)

    # Enlèv. de mat.-Extru.-Mince1: cut by enl_v_de_mat_extru_mince1_tool
    add(enl_v_de_mat_extru_mince1_tool.part, mode=Mode.SUBTRACT)


with BuildPart() as enl_v_de_mat_extru_mince1_profile_2_tool:
    # Esquisse17 → Enlèv. de mat.-Extru.-Mince1 profile 2 (with draft: the straight prism first)
    with BuildSketch(Plane(origin=(0, 12, 0), x_dir=(1, 0, 0), z_dir=(0, 1, 0))):
        Polygon((-40.1, 20.034054341), (-68.262395693, -28.744645862), (-59.024791386, -44.744645862), (-2.7, -44.744645862), (-2.7, -42.844645862), (-57.927825874, -42.844645862), (-66.06846467, -28.744645862), (-38.454551733, 19.084054341), align=None)
    extrude(amount=-ENL_V_DE_MAT_EXTRU_MINCE1_PROFILE_2_DEPTH)
    # Enlèv. de mat.-Extru.-Mince1 profile 2: the draft: its side faces are tilted about the plane it starts from
    enl_v_de_mat_extru_mince1_profile_2_sides = [enl_v_de_mat_extru_mince1_profile_2_tool.faces().sort_by_distance(p)[0] for p in [
        (-54.181197846, 11.2, 4.355295761),
        (-63.643593539, 11.2, 36.744645862),
        (-30.862395693, 11.2, 44.744645862),
        (-2.7, 11.2, 43.794645862),
        (-30.313912937, 11.2, 42.844645862),
        (-61.998145272, 11.2, 35.794645862),
        (-52.261508201, 11.2, 4.830295761),
        (-39.277275866, 11.2, -19.559054341),
    ]]
    draft(enl_v_de_mat_extru_mince1_profile_2_sides, Plane(origin=(0, 12, 0), x_dir=(1, 0, 0), z_dir=(0, 1, 0)), ENL_V_DE_MAT_EXTRU_MINCE1_PROFILE_2_DRAFT)


with BuildPart() as part_2:
    add(part_1.part)

    # Enlèv. de mat.-Extru.-Mince1 profile 2: cut by enl_v_de_mat_extru_mince1_profile_2_tool
    add(enl_v_de_mat_extru_mince1_profile_2_tool.part, mode=Mode.SUBTRACT)


with BuildPart() as enl_v_de_mat_extru_mince1_profile_3_tool:
    # Esquisse17 → Enlèv. de mat.-Extru.-Mince1 profile 3 (with draft: the straight prism first)
    with BuildSketch(Plane(origin=(0, 12, 0), x_dir=(1, 0, 0), z_dir=(0, 1, 0))):
        Polygon((2.7, -44.744645862), (59.024791386, -44.744645862), (68.262395693, -28.744645862), (40.1, 20.034054341), (38.454551733, 19.084054341), (66.06846467, -28.744645862), (57.927825874, -42.844645862), (2.7, -42.844645862), align=None)
    extrude(amount=-ENL_V_DE_MAT_EXTRU_MINCE1_PROFILE_3_DEPTH)
    # Enlèv. de mat.-Extru.-Mince1 profile 3: the draft: its side faces are tilted about the plane it starts from
    enl_v_de_mat_extru_mince1_profile_3_sides = [enl_v_de_mat_extru_mince1_profile_3_tool.faces().sort_by_distance(p)[0] for p in [
        (30.862395693, 11.2, 44.744645862),
        (63.643593539, 11.2, 36.744645862),
        (54.181197846, 11.2, 4.355295761),
        (39.277275866, 11.2, -19.559054341),
        (52.261508201, 11.2, 4.830295761),
        (61.998145272, 11.2, 35.794645862),
        (30.313912937, 11.2, 42.844645862),
        (2.7, 11.2, 43.794645862),
    ]]
    draft(enl_v_de_mat_extru_mince1_profile_3_sides, Plane(origin=(0, 12, 0), x_dir=(1, 0, 0), z_dir=(0, 1, 0)), ENL_V_DE_MAT_EXTRU_MINCE1_PROFILE_3_DRAFT)


with BuildPart() as part_3:
    add(part_2.part)

    # Enlèv. de mat.-Extru.-Mince1 profile 3: cut by enl_v_de_mat_extru_mince1_profile_3_tool
    add(enl_v_de_mat_extru_mince1_profile_3_tool.part, mode=Mode.SUBTRACT)

    # Esquisse18 → Enlèv. mat.-Extru.10 (cut)
    with BuildSketch(Plane(origin=(0, 12, 0), x_dir=(1, 0, 0), z_dir=(0, 1, 0))):
        with Locations((37.5, -42.944645862)):
            Rectangle(ESQUISSE18_W, ESQUISSE18_H)
        with Locations((-37.5, -42.944645862)):
            Rectangle(ESQUISSE18_W, ESQUISSE18_H)
        Polygon((-52.363526329, -7.006996341), (-57.613526329, -16.100263081), (-59.518782217, -15.000263081), (-54.268782217, -5.906996341), align=None)
        Polygon((-20.113526329, 48.851642203), (-22.018782217, 49.951642203), (-16.768782217, 59.044908943), (-14.863526329, 57.944908943), align=None)
        Polygon((20.113526329, 48.851642203), (14.863526329, 57.944908943), (16.768782217, 59.044908943), (22.018782217, 49.951642203), align=None)
        Polygon((52.363526329, -7.006996341), (54.268782217, -5.906996341), (59.518782217, -15.000263081), (57.613526329, -16.100263081), align=None)
    extrude(amount=-ENL_V_MAT_EXTRU_10_DEPTH, mode=Mode.SUBTRACT)


solid = part_3.part
